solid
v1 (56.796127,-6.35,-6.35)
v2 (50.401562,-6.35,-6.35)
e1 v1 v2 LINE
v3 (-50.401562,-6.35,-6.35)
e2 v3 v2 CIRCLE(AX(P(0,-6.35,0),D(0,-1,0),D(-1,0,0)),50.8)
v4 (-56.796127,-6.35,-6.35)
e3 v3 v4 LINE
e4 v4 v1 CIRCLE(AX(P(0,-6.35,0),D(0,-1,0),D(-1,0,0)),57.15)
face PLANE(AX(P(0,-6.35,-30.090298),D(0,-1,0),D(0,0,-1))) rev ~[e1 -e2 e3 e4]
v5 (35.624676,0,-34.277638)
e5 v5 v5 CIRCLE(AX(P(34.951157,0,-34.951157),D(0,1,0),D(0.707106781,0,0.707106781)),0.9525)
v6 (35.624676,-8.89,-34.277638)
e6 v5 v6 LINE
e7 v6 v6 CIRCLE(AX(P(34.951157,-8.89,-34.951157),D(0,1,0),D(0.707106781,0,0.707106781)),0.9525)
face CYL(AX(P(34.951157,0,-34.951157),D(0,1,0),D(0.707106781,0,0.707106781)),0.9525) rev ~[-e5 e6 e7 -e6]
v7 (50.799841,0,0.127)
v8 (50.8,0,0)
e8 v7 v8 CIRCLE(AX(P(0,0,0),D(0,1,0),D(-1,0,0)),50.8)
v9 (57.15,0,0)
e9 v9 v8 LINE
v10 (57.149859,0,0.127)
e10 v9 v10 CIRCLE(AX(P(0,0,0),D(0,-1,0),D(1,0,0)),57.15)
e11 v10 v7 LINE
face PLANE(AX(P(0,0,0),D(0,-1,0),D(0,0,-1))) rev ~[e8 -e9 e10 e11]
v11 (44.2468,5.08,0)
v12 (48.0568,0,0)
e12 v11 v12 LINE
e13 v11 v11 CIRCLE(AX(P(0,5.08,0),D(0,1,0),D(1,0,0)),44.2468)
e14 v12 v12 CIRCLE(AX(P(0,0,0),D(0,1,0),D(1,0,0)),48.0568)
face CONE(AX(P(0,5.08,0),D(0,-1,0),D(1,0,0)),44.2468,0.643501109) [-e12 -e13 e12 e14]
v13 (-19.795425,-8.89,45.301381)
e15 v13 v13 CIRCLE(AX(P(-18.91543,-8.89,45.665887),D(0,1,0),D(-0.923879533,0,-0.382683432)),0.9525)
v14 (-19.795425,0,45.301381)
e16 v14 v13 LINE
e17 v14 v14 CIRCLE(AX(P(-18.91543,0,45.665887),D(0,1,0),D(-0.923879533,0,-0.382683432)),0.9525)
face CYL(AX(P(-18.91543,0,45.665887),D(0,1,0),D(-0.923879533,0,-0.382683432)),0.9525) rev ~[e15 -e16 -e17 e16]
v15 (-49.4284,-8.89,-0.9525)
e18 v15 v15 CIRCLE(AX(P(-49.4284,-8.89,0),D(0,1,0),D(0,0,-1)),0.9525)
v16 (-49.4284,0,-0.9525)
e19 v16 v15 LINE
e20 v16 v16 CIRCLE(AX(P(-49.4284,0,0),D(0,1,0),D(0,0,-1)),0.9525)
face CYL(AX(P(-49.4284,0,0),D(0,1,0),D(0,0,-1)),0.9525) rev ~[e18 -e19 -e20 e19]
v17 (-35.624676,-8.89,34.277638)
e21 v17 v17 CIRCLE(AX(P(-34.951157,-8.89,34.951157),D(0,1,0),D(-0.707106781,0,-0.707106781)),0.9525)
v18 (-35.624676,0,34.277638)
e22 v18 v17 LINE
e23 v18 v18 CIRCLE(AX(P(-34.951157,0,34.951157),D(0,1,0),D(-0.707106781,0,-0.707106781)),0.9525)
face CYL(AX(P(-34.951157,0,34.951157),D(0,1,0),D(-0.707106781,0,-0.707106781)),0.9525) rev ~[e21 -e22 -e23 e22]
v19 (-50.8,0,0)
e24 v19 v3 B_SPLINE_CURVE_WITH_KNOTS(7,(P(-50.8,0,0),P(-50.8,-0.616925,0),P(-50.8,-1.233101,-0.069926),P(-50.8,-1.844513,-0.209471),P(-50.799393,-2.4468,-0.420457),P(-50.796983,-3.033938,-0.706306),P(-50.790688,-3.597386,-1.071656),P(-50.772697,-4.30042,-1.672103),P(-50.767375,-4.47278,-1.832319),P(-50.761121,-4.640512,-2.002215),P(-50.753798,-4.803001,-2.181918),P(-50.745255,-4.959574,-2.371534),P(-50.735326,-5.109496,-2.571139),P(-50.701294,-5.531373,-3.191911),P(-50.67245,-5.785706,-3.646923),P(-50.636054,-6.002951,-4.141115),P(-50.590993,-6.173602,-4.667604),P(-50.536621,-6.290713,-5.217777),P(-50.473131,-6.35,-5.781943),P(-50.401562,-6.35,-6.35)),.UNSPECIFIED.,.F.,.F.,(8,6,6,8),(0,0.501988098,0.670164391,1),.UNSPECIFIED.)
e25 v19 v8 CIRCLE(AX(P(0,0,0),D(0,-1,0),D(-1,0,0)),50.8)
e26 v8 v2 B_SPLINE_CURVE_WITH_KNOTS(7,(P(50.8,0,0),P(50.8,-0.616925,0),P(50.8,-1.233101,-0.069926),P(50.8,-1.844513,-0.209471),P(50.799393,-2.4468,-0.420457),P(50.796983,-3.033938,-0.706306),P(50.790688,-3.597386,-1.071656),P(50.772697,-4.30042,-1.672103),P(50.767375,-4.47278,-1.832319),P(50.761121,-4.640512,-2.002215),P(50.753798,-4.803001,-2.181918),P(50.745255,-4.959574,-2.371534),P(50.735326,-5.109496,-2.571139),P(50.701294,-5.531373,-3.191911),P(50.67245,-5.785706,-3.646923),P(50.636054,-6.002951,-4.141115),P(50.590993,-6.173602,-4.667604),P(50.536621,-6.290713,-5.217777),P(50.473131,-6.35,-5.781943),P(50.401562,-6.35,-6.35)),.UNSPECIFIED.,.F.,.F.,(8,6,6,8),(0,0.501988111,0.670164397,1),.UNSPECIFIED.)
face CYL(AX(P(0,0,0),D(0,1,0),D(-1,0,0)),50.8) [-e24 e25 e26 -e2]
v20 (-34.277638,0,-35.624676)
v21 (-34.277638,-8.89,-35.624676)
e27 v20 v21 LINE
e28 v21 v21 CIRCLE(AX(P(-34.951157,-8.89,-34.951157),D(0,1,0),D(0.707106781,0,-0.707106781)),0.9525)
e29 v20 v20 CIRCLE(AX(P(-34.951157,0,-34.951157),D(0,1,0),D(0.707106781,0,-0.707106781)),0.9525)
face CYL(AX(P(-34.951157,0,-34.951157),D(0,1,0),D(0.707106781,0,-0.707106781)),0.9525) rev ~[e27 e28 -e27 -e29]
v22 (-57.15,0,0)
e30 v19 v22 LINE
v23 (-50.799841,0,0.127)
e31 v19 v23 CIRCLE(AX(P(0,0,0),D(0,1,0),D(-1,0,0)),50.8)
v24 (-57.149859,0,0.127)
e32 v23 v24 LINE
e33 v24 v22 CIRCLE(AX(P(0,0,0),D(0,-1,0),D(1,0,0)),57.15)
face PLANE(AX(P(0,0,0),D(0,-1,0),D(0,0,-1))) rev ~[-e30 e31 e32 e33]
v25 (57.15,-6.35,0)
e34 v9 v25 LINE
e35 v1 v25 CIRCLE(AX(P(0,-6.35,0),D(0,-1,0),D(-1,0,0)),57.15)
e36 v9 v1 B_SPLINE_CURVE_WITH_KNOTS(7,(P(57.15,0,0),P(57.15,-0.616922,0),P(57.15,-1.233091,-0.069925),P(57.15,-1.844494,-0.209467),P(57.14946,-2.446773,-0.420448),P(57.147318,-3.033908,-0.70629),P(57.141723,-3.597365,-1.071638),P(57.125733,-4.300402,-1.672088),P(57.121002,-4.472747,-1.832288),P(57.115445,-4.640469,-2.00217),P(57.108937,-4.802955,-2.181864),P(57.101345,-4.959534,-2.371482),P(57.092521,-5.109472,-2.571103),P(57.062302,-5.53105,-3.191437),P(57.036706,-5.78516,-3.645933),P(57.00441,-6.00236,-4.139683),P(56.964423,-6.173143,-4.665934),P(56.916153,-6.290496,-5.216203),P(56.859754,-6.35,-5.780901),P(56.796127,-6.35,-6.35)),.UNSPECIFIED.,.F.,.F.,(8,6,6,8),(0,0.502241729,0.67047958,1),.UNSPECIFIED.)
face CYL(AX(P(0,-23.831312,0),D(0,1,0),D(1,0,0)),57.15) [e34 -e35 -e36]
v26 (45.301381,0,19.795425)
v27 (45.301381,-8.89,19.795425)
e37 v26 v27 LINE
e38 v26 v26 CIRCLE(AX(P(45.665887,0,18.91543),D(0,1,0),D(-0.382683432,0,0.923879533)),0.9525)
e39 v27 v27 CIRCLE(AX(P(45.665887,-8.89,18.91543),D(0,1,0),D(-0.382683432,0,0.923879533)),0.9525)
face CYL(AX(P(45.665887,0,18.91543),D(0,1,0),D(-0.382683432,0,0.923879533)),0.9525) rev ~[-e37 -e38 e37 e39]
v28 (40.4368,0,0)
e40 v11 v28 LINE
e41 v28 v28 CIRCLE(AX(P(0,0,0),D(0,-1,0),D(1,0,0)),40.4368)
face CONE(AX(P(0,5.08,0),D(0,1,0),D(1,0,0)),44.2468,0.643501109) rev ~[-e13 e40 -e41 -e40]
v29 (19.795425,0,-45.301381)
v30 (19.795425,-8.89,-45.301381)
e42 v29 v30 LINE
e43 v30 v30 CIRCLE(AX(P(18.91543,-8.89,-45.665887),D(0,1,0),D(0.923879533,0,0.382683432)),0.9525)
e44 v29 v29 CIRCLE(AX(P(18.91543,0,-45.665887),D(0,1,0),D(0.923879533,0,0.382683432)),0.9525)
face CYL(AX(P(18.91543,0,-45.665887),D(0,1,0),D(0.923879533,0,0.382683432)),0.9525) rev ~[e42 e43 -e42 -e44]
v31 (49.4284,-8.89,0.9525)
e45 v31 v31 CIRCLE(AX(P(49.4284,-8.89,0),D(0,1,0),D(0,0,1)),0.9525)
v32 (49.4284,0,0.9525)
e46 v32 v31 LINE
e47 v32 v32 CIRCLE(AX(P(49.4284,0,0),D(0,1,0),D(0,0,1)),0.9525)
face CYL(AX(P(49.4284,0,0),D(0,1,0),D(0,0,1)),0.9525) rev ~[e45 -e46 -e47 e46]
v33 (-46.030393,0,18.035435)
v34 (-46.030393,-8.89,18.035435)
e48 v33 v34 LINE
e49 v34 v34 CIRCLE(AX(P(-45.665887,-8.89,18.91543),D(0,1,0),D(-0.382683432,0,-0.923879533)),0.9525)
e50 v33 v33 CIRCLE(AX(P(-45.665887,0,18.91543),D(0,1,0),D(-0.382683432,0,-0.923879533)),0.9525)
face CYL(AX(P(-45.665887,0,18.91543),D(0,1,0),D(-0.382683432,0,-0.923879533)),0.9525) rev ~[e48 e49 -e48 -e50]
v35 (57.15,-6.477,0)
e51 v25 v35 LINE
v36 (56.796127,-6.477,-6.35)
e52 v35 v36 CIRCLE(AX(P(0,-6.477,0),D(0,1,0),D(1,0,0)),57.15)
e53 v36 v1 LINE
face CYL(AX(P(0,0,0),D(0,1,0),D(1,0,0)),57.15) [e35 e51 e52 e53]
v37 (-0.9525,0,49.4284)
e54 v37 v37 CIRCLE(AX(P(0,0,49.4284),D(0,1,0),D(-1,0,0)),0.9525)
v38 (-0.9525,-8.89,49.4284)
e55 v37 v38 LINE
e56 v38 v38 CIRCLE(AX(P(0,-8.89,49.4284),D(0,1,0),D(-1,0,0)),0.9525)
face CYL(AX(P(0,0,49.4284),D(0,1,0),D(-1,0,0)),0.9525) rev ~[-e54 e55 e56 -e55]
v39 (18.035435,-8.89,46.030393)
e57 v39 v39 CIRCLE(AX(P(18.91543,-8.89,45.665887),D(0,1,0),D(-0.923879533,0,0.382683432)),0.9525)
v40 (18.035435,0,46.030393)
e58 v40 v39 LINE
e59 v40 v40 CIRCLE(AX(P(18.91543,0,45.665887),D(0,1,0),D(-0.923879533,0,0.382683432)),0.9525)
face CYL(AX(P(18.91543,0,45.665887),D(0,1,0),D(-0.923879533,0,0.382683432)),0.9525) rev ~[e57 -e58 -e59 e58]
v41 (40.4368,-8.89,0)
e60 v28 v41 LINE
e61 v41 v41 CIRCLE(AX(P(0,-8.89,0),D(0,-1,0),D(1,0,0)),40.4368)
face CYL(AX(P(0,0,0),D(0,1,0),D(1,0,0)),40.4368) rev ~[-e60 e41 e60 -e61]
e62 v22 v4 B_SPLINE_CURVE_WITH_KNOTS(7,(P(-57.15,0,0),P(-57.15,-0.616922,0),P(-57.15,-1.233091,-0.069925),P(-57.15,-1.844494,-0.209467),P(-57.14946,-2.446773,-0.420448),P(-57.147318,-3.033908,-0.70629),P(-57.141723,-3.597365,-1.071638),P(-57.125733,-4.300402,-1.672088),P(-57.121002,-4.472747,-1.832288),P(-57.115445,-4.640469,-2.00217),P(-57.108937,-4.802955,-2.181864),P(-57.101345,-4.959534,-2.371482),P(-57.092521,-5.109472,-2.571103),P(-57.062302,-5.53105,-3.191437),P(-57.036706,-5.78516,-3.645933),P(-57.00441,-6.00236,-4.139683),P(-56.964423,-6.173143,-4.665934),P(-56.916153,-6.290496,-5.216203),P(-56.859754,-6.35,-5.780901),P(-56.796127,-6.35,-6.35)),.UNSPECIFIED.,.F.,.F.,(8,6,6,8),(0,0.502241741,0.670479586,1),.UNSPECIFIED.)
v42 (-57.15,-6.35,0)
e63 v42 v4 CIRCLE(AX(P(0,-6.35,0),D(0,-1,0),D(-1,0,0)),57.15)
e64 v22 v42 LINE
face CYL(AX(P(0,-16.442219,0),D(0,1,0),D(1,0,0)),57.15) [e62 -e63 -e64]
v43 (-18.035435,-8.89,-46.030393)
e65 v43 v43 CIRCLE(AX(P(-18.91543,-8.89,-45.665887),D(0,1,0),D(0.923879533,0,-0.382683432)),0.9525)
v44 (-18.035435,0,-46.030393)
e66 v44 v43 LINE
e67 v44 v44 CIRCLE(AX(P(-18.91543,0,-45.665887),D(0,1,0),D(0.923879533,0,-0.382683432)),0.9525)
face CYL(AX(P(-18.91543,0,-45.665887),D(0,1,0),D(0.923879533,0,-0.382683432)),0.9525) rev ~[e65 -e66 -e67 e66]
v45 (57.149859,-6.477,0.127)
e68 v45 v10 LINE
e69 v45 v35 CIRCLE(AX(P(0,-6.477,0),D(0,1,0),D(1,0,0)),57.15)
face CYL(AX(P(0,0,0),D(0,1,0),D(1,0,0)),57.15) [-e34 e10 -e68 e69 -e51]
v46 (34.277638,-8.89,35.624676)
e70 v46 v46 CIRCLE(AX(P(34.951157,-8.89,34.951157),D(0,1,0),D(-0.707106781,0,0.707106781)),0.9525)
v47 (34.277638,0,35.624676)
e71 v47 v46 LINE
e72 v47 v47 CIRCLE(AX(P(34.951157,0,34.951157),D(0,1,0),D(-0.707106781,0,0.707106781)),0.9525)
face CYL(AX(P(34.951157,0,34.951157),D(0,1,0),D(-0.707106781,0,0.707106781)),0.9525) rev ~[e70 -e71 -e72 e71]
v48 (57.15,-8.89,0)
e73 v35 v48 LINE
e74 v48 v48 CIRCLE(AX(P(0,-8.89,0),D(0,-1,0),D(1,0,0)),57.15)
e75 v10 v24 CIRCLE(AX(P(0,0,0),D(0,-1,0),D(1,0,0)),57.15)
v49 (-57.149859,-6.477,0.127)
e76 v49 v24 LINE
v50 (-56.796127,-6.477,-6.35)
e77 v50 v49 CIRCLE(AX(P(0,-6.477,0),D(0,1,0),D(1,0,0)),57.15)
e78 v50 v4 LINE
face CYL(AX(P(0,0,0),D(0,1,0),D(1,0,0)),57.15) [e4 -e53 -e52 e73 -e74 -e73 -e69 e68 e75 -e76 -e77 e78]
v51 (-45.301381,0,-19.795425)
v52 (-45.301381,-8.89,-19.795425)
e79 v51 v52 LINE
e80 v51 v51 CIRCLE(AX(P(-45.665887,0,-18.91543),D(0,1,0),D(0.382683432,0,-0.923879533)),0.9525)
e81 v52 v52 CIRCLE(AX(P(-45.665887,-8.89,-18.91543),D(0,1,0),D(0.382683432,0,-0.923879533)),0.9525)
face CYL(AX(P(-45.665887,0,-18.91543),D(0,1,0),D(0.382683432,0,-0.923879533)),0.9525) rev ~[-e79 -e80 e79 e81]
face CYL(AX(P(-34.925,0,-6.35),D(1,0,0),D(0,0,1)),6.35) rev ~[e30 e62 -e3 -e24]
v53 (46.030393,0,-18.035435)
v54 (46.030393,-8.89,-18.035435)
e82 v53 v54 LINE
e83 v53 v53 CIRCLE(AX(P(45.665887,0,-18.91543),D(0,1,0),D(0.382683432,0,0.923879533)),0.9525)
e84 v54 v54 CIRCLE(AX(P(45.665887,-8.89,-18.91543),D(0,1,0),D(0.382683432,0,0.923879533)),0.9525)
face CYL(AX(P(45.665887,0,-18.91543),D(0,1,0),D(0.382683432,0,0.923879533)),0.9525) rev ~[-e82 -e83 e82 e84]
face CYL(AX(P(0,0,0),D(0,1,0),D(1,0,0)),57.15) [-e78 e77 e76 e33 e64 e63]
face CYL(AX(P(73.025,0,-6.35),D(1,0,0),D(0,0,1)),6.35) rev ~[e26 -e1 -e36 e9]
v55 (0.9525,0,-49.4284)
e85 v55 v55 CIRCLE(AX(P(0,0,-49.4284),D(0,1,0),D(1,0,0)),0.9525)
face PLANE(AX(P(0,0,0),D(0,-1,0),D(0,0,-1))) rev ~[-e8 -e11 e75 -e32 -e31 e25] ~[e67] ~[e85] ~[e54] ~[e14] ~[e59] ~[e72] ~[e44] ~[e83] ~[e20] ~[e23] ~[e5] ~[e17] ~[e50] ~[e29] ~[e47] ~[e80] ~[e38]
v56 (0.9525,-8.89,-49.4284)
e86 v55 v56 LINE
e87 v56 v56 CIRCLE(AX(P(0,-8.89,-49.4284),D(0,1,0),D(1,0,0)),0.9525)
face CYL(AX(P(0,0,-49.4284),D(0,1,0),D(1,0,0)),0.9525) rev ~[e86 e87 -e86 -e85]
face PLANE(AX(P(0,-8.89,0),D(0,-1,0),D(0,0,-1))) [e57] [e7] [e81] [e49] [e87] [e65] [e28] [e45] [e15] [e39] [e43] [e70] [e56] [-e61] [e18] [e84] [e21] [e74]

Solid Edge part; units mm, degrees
sketch "Sketch1" plane through (0, 0, 0) normal (0, -1, 0) x (1, 0, 0)
  circle A0 centre (0, 0) radius 40.4368
  circle A1 centre (0, 0) radius 50.8
  dimension "D1" = 101.6
  dimension "D2" = 114.3
  dimension "D3" = 80.8736
extrude "Protrusion1" add sketch "Sketch1" along normal blind 8.89
sketch "Sketch2" plane through (0, 0, 0) normal (0, 0, 1) x (1, 0, 0)
  line L0 (44.2468, 5.08) -> (40.4368, 0)
  line L1 (40.4368, 0) -> (48.0568, 0)
  line L2 (44.2468, 5.08) -> (48.0568, 0)
revolve "RevolvedProtrusion1" add sketch "Sketch2" angle 360 about axis through (0, 0, 0) along (0, 1, 0)
sketch "Sketch3" plane through (0, 0, 0) normal (0, 1, 0) x (-1, 0, 0)
  circle A0 centre (0, 49.4284) radius 0.9525
extrude "Cutout1" cut sketch "Sketch3" against normal through all
pattern_circular "Pattern_2" count 16 over 360 about axis through (0, 0, 0) along (0, 1, 0) of "Cutout1"
sketch "Sketch4" plane through (0, 0, 0) normal (0, -1, 0) x (1, 0, 0)
  circle A0 centre (0, 0) radius 57.15
  circle A1 centre (0, 0) radius 50.8
  dimension "D1" = 101.6
  dimension "D2" = 114.3
  dimension "D3" = 80.8736
extrude "Protrusion2" add sketch "Sketch4" along normal up to vertex (8.89 mm away)
sketch "Sketch5" plane through (0, 0, 0) normal (0, 1, 0) x (-1, 0, 0)
  line L0 (-57.15, 0) -> (-50.8, 0)
  line L1 (50.8, 0) -> (57.15, 0)
  arc A0 (50.8, 0) -> (-50.8, 0) centre (0, 0) cw
  arc A1 (57.15, 0) -> (-57.15, 0) centre (0, 0) cw
extrude "ExtrudedCutout_34" cut sketch "Sketch5" against normal blind 6.35
fillet "Round_1" radius 6.35 2 edges at (53.975, -6.35, 0) (-53.975, -6.35, 0)
